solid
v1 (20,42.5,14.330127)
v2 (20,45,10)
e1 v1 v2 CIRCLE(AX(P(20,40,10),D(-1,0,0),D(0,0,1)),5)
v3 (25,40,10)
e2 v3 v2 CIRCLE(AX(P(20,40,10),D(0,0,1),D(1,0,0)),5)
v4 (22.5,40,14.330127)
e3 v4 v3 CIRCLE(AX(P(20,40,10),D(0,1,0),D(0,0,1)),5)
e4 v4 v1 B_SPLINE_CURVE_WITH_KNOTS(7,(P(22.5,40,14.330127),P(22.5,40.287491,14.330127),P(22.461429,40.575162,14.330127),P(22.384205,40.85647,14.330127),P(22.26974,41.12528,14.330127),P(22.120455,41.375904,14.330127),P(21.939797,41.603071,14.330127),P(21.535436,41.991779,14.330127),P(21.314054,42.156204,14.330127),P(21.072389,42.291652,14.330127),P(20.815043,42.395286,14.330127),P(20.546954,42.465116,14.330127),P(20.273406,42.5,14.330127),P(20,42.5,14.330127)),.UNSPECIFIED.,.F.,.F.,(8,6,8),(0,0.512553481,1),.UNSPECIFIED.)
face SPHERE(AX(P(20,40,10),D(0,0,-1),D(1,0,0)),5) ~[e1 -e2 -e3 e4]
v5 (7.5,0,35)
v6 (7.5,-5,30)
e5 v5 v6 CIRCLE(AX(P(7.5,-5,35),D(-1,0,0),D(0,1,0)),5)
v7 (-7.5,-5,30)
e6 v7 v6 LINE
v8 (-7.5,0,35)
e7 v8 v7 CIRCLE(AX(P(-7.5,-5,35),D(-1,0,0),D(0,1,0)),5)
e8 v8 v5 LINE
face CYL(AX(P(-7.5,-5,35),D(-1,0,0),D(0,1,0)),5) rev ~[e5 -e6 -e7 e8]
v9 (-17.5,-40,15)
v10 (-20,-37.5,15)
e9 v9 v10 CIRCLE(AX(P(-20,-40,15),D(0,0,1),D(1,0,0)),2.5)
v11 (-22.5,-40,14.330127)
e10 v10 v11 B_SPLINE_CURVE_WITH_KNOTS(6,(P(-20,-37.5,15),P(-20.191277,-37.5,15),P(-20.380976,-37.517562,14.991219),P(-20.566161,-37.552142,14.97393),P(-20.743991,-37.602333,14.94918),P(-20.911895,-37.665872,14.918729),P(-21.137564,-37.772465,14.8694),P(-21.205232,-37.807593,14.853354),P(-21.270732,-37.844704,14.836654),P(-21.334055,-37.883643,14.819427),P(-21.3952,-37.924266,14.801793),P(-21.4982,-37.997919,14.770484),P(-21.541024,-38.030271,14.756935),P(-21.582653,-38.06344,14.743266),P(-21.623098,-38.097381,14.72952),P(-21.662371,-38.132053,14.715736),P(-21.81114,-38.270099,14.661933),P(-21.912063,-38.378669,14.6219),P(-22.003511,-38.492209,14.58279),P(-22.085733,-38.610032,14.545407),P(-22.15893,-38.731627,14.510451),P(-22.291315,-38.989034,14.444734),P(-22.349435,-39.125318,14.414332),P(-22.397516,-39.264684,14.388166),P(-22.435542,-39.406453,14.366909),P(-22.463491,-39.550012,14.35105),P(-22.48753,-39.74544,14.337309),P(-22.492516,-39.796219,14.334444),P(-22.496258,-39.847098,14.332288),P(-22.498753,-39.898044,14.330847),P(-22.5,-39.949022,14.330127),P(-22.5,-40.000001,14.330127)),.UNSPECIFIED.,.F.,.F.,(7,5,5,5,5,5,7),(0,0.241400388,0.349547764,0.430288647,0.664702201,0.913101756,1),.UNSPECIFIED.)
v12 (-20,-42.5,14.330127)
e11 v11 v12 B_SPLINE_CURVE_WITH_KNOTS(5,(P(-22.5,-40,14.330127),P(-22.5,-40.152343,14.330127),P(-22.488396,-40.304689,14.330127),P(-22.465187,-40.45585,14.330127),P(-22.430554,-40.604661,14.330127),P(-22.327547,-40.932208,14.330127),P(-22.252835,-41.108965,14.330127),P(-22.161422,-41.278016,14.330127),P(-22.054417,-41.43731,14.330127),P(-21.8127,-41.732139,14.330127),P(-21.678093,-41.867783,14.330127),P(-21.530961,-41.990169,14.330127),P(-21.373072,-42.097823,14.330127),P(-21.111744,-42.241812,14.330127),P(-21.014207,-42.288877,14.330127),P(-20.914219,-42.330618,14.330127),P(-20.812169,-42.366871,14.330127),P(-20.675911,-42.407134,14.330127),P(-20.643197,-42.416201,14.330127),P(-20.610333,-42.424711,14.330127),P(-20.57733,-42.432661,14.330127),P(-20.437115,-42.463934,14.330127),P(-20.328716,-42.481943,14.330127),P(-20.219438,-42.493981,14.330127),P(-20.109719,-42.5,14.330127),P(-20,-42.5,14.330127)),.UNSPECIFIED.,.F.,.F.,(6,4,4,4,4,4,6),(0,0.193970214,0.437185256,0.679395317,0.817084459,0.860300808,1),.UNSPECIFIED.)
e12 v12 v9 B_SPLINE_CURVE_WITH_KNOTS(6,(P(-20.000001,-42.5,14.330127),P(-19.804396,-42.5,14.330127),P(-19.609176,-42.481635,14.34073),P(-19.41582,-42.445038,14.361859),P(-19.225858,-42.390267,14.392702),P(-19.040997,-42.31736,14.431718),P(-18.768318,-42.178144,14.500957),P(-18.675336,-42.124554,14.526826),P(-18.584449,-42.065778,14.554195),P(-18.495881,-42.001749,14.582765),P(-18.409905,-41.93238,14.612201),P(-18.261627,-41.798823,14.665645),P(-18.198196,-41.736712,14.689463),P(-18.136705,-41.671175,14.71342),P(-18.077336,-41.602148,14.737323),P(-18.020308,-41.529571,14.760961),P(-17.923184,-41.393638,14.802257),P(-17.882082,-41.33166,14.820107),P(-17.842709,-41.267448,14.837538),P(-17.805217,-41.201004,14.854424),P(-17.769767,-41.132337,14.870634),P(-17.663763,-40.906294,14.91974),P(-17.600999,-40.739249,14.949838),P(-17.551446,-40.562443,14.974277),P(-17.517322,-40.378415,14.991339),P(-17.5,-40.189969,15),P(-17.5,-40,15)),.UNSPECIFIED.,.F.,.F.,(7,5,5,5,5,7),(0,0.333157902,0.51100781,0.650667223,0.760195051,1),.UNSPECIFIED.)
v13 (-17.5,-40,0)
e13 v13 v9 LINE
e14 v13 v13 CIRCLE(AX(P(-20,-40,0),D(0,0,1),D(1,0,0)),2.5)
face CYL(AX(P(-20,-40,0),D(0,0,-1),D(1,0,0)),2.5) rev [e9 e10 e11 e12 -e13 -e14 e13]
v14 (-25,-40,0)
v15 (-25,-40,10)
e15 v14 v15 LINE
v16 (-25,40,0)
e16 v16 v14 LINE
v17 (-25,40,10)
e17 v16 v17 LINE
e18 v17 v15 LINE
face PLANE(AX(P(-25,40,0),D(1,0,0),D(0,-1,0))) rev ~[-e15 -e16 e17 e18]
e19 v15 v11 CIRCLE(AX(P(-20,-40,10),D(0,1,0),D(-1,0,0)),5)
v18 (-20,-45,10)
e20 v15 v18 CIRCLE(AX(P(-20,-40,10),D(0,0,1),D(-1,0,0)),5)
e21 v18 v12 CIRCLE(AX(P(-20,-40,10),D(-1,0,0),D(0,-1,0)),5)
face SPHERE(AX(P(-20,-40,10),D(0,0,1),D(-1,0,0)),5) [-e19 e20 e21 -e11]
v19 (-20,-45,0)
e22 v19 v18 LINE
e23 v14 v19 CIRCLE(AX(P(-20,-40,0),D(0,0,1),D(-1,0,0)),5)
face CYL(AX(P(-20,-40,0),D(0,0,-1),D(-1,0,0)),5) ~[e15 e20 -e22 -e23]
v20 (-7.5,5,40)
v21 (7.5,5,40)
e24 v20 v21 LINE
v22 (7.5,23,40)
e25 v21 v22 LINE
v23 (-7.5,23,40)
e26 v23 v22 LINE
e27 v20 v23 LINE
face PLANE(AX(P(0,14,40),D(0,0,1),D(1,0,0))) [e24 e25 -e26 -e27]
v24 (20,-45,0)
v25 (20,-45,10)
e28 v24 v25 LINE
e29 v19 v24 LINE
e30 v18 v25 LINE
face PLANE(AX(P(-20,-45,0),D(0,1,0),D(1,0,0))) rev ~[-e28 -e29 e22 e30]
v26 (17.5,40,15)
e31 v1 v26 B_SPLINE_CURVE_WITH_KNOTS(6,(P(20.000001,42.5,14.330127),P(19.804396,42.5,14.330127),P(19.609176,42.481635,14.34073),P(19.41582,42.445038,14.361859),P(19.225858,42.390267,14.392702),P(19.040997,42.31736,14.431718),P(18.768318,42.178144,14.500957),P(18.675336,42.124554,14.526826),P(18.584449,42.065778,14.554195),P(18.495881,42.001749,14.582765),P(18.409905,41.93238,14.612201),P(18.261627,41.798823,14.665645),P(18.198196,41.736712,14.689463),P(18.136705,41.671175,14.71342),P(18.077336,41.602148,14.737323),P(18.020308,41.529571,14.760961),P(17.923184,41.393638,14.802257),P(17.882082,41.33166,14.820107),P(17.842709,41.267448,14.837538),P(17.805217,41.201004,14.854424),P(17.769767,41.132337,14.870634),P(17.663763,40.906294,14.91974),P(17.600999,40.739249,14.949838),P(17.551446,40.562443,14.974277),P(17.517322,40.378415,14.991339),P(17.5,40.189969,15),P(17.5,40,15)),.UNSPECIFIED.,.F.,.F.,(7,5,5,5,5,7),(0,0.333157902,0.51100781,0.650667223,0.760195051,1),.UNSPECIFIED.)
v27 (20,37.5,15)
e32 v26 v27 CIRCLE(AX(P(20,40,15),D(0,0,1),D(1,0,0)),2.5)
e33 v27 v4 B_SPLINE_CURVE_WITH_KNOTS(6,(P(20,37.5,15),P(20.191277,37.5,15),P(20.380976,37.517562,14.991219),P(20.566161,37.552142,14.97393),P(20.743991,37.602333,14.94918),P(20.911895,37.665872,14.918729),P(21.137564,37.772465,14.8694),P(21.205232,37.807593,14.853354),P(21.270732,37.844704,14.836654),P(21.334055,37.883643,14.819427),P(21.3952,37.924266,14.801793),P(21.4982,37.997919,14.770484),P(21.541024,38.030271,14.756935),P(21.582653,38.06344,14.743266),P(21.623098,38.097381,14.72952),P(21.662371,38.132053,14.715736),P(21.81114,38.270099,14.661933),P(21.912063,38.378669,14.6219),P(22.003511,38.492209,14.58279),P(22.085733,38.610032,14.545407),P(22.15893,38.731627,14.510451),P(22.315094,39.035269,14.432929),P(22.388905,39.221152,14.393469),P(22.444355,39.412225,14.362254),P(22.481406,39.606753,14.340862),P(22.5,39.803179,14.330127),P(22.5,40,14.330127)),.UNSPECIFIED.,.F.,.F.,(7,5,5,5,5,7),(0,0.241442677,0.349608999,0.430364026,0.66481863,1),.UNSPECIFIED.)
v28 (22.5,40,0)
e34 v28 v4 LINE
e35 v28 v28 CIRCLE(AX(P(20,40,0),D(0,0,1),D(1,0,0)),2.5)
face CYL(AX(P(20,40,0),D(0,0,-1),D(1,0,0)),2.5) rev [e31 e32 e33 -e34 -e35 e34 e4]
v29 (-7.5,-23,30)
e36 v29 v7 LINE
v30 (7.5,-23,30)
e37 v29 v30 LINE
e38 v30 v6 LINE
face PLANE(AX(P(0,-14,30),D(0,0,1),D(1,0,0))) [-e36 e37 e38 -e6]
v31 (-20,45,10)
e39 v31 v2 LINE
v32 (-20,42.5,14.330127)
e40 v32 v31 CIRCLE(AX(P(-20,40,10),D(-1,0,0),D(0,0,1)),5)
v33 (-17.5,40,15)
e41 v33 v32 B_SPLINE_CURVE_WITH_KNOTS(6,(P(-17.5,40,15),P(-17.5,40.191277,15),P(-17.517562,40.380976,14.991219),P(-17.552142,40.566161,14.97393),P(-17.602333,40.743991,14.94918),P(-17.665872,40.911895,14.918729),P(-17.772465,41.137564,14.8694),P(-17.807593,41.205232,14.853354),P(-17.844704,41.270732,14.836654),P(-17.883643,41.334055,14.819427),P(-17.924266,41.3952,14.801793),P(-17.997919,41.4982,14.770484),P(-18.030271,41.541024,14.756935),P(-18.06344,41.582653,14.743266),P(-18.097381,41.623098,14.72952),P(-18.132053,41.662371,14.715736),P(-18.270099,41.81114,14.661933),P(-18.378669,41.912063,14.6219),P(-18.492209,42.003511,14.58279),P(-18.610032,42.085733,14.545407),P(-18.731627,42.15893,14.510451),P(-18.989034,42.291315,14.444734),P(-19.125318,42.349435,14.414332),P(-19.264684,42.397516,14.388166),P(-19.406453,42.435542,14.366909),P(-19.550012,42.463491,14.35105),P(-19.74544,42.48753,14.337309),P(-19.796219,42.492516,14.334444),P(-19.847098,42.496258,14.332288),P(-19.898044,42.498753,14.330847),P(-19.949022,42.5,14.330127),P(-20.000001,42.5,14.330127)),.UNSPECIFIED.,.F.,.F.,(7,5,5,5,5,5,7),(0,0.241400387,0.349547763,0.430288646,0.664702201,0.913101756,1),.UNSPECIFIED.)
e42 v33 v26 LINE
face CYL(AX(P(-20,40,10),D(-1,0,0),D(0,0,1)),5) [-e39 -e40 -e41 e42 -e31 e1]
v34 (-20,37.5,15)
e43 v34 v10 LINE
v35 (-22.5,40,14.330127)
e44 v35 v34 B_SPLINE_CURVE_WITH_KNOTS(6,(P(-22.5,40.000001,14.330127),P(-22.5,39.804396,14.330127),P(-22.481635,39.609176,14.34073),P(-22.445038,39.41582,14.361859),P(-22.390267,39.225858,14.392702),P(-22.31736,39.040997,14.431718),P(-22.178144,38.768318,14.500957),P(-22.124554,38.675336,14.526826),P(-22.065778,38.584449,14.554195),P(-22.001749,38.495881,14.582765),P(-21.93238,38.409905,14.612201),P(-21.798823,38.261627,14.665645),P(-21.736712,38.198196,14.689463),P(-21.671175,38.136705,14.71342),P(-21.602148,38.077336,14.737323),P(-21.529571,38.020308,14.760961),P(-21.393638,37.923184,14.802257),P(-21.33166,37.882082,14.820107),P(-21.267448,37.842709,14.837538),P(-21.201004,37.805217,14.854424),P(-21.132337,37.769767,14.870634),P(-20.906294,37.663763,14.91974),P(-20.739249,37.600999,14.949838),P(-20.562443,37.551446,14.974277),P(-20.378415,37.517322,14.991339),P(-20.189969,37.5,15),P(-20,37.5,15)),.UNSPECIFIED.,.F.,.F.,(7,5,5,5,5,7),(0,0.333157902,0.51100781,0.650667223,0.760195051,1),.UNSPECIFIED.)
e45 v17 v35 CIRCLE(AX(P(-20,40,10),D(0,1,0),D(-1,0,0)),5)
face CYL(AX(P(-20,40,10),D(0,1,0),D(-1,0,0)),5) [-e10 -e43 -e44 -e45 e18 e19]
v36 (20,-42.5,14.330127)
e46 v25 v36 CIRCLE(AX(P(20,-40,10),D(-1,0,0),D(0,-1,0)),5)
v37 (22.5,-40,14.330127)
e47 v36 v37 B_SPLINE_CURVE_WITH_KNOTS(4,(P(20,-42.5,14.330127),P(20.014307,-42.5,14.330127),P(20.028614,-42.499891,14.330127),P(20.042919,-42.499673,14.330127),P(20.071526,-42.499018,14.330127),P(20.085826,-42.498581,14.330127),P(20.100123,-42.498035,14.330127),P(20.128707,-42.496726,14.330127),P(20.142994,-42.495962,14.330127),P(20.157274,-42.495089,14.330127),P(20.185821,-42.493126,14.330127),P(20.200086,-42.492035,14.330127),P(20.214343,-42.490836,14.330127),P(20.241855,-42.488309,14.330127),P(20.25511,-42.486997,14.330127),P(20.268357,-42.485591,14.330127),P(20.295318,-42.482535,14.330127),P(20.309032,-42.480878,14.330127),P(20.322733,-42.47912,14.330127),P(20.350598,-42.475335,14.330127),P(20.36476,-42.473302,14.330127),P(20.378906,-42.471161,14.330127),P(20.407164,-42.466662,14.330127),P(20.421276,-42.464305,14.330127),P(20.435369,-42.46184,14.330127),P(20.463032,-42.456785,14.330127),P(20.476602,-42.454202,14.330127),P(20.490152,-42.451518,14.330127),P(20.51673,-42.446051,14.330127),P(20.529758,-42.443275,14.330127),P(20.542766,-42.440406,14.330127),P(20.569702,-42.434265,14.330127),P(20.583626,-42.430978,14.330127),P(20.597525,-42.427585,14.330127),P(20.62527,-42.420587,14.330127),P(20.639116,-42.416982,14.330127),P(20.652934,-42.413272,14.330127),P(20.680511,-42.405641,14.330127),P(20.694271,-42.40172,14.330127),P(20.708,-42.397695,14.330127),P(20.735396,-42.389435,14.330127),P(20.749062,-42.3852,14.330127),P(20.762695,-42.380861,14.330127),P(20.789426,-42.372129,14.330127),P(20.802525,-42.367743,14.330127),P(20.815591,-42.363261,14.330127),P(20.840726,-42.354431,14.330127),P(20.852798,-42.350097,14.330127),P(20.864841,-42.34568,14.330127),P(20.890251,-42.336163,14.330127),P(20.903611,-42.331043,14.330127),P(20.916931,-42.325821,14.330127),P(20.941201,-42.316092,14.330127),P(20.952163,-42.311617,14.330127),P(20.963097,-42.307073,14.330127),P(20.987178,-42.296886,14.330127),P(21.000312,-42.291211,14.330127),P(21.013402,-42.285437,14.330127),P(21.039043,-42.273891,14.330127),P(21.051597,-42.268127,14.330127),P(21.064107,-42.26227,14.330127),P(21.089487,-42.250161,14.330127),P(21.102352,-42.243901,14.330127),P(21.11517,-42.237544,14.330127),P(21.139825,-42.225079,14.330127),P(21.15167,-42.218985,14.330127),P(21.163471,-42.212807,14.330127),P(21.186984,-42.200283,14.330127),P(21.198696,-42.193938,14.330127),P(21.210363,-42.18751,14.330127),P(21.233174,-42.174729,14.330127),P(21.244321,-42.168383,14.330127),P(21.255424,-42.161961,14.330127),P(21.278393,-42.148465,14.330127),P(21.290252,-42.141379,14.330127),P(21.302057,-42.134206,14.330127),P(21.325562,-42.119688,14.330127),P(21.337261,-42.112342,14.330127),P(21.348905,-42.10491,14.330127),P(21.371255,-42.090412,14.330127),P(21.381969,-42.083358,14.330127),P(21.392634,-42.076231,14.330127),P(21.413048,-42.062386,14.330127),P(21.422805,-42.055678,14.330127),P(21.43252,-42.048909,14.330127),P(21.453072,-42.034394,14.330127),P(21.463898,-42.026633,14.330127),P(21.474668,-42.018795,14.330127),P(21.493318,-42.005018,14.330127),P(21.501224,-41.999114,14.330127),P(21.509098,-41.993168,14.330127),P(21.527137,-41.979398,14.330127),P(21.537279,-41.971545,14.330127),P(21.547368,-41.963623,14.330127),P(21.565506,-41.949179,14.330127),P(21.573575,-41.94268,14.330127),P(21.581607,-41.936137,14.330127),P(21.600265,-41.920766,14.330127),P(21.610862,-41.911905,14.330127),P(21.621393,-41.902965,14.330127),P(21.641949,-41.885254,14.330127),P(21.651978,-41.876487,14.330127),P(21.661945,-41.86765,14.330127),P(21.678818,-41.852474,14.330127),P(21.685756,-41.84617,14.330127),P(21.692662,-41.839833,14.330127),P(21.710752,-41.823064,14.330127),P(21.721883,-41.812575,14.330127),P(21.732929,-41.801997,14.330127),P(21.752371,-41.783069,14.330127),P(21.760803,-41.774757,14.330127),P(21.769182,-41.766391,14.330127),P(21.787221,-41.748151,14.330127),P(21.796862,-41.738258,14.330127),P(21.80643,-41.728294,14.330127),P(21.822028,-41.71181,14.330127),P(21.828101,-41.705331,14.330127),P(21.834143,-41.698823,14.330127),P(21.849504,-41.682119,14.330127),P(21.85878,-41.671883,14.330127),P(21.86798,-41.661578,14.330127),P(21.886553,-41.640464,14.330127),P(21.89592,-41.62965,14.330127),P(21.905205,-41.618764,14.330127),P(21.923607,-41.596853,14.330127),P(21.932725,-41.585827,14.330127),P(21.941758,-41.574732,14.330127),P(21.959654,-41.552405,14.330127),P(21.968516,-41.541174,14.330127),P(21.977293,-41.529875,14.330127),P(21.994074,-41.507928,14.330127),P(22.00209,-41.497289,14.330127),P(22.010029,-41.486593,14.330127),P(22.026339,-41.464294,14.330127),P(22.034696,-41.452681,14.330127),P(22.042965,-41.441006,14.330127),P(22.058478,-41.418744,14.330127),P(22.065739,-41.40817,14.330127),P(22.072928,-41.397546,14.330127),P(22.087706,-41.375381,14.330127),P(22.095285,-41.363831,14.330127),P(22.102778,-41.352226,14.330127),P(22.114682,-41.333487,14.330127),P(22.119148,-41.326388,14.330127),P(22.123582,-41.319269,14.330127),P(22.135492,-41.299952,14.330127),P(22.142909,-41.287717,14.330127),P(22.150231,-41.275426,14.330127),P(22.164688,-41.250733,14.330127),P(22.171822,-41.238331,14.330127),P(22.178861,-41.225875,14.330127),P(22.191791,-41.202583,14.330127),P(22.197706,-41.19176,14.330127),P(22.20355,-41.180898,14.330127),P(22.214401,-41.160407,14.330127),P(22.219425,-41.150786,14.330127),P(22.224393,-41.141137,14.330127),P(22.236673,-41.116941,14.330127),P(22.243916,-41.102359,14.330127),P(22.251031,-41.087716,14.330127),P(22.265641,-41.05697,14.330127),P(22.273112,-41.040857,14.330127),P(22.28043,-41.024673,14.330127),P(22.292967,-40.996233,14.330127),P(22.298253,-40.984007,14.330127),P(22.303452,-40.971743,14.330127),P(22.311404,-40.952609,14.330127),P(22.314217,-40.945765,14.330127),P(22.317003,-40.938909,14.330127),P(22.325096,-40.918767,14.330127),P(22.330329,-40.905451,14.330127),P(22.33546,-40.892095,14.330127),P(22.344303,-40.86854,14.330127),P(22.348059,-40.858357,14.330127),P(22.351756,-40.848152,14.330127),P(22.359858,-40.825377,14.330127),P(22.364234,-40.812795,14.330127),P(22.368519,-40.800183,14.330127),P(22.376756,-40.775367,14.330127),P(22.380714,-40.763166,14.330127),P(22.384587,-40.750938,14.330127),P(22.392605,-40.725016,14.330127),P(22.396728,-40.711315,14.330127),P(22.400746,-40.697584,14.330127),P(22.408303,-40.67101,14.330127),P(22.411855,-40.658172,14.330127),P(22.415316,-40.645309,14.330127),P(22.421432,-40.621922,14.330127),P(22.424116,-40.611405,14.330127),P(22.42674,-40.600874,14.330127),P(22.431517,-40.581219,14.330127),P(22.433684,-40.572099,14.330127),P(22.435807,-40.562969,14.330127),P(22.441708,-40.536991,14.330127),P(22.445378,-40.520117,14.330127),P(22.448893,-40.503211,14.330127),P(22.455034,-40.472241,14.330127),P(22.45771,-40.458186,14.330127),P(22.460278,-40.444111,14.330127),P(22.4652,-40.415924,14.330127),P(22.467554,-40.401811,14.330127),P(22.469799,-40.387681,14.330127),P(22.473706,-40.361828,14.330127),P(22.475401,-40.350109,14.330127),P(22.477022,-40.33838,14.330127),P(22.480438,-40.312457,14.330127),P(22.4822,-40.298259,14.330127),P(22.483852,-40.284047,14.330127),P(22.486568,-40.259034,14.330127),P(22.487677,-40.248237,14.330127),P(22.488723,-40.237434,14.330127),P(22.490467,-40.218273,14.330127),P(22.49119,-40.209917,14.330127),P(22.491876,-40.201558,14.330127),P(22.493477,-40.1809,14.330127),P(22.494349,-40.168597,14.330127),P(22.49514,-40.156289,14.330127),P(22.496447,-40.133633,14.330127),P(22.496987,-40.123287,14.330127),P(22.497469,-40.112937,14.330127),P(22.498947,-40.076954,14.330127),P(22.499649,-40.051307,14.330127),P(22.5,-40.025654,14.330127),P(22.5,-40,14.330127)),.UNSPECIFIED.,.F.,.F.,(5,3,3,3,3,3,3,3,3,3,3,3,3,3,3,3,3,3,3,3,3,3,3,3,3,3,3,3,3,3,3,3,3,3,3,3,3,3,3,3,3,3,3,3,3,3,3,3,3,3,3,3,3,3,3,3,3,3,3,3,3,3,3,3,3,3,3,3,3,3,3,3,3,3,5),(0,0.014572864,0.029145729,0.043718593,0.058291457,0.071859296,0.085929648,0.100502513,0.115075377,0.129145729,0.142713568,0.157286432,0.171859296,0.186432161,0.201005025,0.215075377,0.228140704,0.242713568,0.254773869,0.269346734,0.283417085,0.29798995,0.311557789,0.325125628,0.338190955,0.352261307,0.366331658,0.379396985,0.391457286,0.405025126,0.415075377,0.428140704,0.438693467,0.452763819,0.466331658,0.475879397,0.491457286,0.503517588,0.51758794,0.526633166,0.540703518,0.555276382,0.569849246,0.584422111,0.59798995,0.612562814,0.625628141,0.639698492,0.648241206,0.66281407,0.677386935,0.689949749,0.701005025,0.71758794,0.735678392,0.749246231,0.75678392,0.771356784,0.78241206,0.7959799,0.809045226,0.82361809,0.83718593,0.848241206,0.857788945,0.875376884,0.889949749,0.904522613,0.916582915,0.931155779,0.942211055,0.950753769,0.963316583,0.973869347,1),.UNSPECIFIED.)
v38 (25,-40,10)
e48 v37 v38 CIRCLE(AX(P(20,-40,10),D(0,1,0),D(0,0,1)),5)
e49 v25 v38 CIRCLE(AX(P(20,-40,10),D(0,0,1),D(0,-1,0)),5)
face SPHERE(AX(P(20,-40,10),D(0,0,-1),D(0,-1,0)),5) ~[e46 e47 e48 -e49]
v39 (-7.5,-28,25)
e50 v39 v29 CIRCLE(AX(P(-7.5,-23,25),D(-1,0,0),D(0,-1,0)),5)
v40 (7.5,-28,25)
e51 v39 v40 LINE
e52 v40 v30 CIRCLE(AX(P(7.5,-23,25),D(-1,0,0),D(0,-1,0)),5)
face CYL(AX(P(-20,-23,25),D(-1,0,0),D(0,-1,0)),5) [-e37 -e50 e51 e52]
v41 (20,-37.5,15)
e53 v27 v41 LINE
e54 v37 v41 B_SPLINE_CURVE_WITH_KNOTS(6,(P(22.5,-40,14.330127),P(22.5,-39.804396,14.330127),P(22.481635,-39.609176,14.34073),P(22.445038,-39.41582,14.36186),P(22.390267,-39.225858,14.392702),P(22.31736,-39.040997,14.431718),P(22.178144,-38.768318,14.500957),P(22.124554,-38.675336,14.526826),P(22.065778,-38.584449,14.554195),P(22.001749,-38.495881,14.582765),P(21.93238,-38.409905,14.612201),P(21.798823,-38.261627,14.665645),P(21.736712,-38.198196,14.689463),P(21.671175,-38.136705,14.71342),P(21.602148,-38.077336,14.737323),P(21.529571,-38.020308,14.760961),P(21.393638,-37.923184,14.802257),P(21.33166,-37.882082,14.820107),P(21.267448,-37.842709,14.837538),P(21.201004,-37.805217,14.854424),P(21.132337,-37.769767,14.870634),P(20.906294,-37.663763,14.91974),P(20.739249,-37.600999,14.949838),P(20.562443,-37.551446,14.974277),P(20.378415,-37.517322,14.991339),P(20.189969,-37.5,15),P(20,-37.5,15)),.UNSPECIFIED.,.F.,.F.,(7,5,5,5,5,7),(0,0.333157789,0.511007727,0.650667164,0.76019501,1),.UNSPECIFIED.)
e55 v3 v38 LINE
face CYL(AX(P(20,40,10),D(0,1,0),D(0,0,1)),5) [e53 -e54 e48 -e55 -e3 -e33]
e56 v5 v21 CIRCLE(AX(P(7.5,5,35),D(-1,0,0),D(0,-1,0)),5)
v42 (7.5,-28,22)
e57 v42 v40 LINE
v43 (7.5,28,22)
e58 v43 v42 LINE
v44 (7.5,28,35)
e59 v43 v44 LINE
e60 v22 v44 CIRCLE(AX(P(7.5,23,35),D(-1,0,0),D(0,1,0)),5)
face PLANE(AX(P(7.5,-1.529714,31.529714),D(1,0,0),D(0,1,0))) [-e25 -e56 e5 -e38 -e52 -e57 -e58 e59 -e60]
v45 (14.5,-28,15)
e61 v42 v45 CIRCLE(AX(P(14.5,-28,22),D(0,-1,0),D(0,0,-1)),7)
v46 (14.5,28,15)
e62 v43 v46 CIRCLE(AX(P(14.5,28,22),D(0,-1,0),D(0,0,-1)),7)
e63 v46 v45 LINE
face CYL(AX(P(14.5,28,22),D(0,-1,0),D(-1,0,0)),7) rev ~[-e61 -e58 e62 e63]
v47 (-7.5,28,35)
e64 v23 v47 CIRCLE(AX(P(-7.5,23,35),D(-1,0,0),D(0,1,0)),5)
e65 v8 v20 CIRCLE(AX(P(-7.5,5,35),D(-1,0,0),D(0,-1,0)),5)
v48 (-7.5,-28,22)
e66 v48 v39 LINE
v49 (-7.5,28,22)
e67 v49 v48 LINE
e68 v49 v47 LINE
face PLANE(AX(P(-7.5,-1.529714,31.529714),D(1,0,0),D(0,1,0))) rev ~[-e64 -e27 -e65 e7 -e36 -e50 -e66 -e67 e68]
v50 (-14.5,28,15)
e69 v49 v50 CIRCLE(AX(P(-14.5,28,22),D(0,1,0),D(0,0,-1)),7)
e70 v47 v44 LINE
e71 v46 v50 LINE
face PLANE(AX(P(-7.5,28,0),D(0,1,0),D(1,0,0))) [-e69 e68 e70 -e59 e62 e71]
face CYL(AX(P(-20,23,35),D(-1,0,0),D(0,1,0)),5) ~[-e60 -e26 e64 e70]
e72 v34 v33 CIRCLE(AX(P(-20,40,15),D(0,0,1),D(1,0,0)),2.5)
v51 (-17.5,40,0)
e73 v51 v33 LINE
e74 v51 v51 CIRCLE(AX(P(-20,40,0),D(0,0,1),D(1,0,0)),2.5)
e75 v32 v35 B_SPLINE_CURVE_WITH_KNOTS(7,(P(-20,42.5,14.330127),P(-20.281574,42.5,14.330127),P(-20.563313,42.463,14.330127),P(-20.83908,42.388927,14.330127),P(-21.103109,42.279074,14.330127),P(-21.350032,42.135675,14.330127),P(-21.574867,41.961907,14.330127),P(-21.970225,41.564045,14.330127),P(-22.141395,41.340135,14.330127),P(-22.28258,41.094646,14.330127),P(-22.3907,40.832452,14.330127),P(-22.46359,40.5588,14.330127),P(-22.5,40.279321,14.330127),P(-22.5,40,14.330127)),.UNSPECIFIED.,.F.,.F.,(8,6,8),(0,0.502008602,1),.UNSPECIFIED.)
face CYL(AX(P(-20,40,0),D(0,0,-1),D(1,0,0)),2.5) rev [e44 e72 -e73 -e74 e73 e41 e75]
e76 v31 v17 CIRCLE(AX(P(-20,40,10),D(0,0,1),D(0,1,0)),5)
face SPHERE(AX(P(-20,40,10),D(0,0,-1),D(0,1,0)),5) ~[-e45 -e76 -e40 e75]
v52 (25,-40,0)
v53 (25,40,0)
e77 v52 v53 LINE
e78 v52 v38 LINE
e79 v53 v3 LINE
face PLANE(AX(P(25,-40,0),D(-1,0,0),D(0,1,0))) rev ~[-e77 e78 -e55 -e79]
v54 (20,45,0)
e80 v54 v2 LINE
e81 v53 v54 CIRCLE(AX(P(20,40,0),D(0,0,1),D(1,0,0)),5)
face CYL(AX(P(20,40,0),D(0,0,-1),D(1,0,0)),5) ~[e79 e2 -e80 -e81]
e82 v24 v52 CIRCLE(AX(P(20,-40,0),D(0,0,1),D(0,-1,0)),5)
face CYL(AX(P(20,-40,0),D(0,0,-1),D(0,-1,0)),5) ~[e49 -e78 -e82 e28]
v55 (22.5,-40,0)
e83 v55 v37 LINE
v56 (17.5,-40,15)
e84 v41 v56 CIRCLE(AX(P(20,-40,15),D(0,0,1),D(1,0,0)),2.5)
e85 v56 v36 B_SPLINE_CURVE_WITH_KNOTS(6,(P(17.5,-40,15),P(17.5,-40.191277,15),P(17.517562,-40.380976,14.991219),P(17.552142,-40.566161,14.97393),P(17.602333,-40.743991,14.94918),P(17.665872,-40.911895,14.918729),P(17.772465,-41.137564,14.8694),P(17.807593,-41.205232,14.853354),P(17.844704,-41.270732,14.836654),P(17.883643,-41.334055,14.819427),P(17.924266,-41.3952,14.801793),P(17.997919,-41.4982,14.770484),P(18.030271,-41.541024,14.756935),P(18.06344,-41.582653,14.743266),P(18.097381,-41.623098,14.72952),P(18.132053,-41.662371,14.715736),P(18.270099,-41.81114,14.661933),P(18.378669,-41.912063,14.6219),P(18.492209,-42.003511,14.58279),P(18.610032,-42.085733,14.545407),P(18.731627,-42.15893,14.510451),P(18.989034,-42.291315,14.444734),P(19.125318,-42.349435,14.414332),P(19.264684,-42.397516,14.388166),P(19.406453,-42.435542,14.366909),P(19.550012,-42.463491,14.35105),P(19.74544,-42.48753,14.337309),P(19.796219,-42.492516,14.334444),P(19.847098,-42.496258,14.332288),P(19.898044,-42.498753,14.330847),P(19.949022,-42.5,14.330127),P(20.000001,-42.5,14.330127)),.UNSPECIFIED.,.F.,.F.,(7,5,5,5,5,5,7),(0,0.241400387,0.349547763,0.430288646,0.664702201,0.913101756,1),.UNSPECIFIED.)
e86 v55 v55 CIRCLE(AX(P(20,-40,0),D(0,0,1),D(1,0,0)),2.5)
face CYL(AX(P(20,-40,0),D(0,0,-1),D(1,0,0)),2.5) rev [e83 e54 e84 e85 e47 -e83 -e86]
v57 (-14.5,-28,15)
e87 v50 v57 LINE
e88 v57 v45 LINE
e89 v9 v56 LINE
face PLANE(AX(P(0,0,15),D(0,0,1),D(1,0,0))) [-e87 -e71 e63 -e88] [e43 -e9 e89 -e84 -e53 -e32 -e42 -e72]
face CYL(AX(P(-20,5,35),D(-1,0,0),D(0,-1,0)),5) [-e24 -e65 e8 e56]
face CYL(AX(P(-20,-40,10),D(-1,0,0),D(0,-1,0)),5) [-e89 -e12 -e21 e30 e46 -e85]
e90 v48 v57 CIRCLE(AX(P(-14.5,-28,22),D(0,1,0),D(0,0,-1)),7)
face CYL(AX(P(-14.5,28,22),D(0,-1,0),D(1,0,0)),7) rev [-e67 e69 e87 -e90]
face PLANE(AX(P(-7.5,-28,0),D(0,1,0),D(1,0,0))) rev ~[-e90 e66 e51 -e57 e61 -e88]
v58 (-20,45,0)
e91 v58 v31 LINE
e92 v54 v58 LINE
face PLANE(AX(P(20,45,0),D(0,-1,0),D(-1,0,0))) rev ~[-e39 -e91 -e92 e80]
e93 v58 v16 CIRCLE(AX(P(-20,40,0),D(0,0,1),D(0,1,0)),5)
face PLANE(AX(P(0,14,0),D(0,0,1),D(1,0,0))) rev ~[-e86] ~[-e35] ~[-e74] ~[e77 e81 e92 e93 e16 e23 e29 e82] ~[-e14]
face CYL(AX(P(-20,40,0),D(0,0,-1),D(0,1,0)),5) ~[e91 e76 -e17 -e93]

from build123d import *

# Parameters (mm, degrees)
F0_R         = 2.5
F1_DEPTH     = 15
F0_W         = 15
F0_H         = 28
F2_DEPTH     = 40
F3_DEPTH     = 30
F4_T1_DEPTH  = 15
F4_T3_DEPTH  = 40
F4_T5_DEPTH  = 80
F4_T8_ANGLE  = 90
F4_T10_ANGLE = 90
F4_T12_ANGLE = 90
F4_T14_ANGLE = 90
F5_R         = 7


# Not quite as in the source:
# - a fillet or chamfer that OpenCascade refuses, or shapes differently, is made with other operations: its cross-section is extruded or revolved along the edge and cut away or added


with BuildPart() as f1:
    # F0 (on Top) → F1 (new body)
    with BuildSketch(Plane.XY):
        with BuildLine():
            ThreePointArc((-25, -40), (-23.5355339059, -43.5355339059), (-20, -45))
            Line((-20, -45), (20, -45))
            ThreePointArc((20, -45), (23.5355339059, -43.5355339059), (25, -40))
            Line((25, -40), (25, 40))
            ThreePointArc((25, 40), (23.5355339059, 43.5355339059), (20, 45))
            Line((20, 45), (-20, 45))
            ThreePointArc((-20, 45), (-23.5355339059, 43.5355339059), (-25, 40))
            Line((-25, 40), (-25, -40))
        make_face()
        with Locations((-20, -40)):
            Circle(F0_R, mode=Mode.SUBTRACT)
        with Locations((20, -40)):
            Circle(F0_R, mode=Mode.SUBTRACT)
        with Locations((-20, 40)):
            Circle(F0_R, mode=Mode.SUBTRACT)
        Polygon((7.5, 28), (7.5, 0), (7.5, -28), (-7.5, -28), (-7.5, 0), (-7.5, 28), align=None, mode=Mode.SUBTRACT)
        with Locations((20, 40)):
            Circle(F0_R, mode=Mode.SUBTRACT)
    extrude(amount=F1_DEPTH)

    # F0 (on Top) → F2 (join)
    with BuildSketch(Plane.XY):
        with Locations((0, 14)):
            Rectangle(F0_W, F0_H)
    extrude(amount=F2_DEPTH)

    # F0 (on Top) → F3 (join)
    with BuildSketch(Plane.XY):
        with Locations((0, -14)):
            Rectangle(F0_W, F0_H)
    extrude(amount=F3_DEPTH)

    # F4: fillet of radius 5 on 6 edges, made by hand

    # F4_s2 → F4_t1 (join)
    with BuildSketch(Plane.YZ.offset(-7.5)):
        with BuildLine():
            ThreePointArc((0, 35), (-1.4644660941, 31.4644660941), (-5, 30))
            Line((-5, 30), (0, 30))
            Line((0, 30), (0, 35))
        make_face()
    extrude(amount=F4_T1_DEPTH)

    # F4_s4 → F4_t3 (cut)
    with BuildSketch(Plane.YZ.offset(-20)):
        with BuildLine():
            ThreePointArc((0, 35), (1.4644660941, 38.5355339059), (5, 40))
            Line((5, 40), (0, 40))
            Line((0, 40), (0, 35))
        make_face()
        with BuildLine():
            ThreePointArc((28, 35), (26.5355339059, 38.5355339059), (23, 40))
            Line((23, 40), (28, 40))
            Line((28, 40), (28, 35))
        make_face()
        with BuildLine():
            ThreePointArc((-45, 10), (-43.5355339059, 13.5355339059), (-40, 15))
            Line((-40, 15), (-45, 15))
            Line((-45, 15), (-45, 10))
        make_face()
        with BuildLine():
            ThreePointArc((-28, 25), (-26.5355339059, 28.5355339059), (-23, 30))
            Line((-23, 30), (-28, 30))
            Line((-28, 30), (-28, 25))
        make_face()
        with BuildLine():
            ThreePointArc((40, 15), (43.5355339059, 13.5355339059), (45, 10))
            Line((45, 10), (45, 15))
            Line((45, 15), (40, 15))
        make_face()
    extrude(amount=F4_T3_DEPTH, mode=Mode.SUBTRACT)

    # F4_s6 → F4_t5 (cut)
    with BuildSketch(Plane.XZ.offset(-40)):
        with BuildLine():
            ThreePointArc((-25, 10), (-23.5355339059, 13.5355339059), (-20, 15))
            Line((-20, 15), (-25, 15))
            Line((-25, 15), (-25, 10))
        make_face()
        with BuildLine():
            ThreePointArc((20, 15), (23.5355339059, 13.5355339059), (25, 10))
            Line((25, 10), (25, 15))
            Line((25, 15), (20, 15))
        make_face()
    extrude(amount=F4_T5_DEPTH, mode=Mode.SUBTRACT)

    # F4_s7 → F4_t8 (revolve, cut)
    with BuildSketch(Plane.XZ.offset(40)):
        with BuildLine():
            ThreePointArc((-25, 10), (-23.5355339059, 13.5355339059), (-20, 15))
            Line((-20, 15), (-25, 15))
            Line((-25, 15), (-25, 10))
        make_face()
    revolve(axis=Axis((-20, -40, 15), (0, 0, 1)), revolution_arc=F4_T8_ANGLE, mode=Mode.SUBTRACT)

    # F4_s9 → F4_t10 (revolve, cut)
    with BuildSketch(Plane.YZ.offset(-20)):
        with BuildLine():
            ThreePointArc((40, 15), (43.5355339059, 13.5355339059), (45, 10))
            Line((45, 10), (45, 15))
            Line((45, 15), (40, 15))
        make_face()
    revolve(axis=Axis((-20, 40, 15), (0, 0, 1)), revolution_arc=F4_T10_ANGLE, mode=Mode.SUBTRACT)

    # F4_s11 → F4_t12 (revolve, cut)
    with BuildSketch(Plane.XZ.offset(-40)):
        with BuildLine():
            ThreePointArc((20, 15), (23.5355339059, 13.5355339059), (25, 10))
            Line((25, 10), (25, 15))
            Line((25, 15), (20, 15))
        make_face()
    revolve(axis=Axis((20, 40, 15), (0, 0, 1)), revolution_arc=F4_T12_ANGLE, mode=Mode.SUBTRACT)

    # F4_s13 → F4_t14 (revolve, cut)
    with BuildSketch(Plane.YZ.offset(20)):
        with BuildLine():
            ThreePointArc((-40, 15), (-43.5355339059, 13.5355339059), (-45, 10))
            Line((-45, 10), (-45, 15))
            Line((-45, 15), (-40, 15))
        make_face()
    revolve(axis=Axis((20, -40, 15), (0, 0, 1)), revolution_arc=F4_T14_ANGLE, mode=Mode.SUBTRACT)

    # F5
    f5_edges = [f1.edges().sort_by_distance(p)[0] for p in [
        (-7.5, 0, 15),
        (7.5, 0, 15),
    ]]
    fillet(f5_edges, radius=F5_R)


solid = f1.part
